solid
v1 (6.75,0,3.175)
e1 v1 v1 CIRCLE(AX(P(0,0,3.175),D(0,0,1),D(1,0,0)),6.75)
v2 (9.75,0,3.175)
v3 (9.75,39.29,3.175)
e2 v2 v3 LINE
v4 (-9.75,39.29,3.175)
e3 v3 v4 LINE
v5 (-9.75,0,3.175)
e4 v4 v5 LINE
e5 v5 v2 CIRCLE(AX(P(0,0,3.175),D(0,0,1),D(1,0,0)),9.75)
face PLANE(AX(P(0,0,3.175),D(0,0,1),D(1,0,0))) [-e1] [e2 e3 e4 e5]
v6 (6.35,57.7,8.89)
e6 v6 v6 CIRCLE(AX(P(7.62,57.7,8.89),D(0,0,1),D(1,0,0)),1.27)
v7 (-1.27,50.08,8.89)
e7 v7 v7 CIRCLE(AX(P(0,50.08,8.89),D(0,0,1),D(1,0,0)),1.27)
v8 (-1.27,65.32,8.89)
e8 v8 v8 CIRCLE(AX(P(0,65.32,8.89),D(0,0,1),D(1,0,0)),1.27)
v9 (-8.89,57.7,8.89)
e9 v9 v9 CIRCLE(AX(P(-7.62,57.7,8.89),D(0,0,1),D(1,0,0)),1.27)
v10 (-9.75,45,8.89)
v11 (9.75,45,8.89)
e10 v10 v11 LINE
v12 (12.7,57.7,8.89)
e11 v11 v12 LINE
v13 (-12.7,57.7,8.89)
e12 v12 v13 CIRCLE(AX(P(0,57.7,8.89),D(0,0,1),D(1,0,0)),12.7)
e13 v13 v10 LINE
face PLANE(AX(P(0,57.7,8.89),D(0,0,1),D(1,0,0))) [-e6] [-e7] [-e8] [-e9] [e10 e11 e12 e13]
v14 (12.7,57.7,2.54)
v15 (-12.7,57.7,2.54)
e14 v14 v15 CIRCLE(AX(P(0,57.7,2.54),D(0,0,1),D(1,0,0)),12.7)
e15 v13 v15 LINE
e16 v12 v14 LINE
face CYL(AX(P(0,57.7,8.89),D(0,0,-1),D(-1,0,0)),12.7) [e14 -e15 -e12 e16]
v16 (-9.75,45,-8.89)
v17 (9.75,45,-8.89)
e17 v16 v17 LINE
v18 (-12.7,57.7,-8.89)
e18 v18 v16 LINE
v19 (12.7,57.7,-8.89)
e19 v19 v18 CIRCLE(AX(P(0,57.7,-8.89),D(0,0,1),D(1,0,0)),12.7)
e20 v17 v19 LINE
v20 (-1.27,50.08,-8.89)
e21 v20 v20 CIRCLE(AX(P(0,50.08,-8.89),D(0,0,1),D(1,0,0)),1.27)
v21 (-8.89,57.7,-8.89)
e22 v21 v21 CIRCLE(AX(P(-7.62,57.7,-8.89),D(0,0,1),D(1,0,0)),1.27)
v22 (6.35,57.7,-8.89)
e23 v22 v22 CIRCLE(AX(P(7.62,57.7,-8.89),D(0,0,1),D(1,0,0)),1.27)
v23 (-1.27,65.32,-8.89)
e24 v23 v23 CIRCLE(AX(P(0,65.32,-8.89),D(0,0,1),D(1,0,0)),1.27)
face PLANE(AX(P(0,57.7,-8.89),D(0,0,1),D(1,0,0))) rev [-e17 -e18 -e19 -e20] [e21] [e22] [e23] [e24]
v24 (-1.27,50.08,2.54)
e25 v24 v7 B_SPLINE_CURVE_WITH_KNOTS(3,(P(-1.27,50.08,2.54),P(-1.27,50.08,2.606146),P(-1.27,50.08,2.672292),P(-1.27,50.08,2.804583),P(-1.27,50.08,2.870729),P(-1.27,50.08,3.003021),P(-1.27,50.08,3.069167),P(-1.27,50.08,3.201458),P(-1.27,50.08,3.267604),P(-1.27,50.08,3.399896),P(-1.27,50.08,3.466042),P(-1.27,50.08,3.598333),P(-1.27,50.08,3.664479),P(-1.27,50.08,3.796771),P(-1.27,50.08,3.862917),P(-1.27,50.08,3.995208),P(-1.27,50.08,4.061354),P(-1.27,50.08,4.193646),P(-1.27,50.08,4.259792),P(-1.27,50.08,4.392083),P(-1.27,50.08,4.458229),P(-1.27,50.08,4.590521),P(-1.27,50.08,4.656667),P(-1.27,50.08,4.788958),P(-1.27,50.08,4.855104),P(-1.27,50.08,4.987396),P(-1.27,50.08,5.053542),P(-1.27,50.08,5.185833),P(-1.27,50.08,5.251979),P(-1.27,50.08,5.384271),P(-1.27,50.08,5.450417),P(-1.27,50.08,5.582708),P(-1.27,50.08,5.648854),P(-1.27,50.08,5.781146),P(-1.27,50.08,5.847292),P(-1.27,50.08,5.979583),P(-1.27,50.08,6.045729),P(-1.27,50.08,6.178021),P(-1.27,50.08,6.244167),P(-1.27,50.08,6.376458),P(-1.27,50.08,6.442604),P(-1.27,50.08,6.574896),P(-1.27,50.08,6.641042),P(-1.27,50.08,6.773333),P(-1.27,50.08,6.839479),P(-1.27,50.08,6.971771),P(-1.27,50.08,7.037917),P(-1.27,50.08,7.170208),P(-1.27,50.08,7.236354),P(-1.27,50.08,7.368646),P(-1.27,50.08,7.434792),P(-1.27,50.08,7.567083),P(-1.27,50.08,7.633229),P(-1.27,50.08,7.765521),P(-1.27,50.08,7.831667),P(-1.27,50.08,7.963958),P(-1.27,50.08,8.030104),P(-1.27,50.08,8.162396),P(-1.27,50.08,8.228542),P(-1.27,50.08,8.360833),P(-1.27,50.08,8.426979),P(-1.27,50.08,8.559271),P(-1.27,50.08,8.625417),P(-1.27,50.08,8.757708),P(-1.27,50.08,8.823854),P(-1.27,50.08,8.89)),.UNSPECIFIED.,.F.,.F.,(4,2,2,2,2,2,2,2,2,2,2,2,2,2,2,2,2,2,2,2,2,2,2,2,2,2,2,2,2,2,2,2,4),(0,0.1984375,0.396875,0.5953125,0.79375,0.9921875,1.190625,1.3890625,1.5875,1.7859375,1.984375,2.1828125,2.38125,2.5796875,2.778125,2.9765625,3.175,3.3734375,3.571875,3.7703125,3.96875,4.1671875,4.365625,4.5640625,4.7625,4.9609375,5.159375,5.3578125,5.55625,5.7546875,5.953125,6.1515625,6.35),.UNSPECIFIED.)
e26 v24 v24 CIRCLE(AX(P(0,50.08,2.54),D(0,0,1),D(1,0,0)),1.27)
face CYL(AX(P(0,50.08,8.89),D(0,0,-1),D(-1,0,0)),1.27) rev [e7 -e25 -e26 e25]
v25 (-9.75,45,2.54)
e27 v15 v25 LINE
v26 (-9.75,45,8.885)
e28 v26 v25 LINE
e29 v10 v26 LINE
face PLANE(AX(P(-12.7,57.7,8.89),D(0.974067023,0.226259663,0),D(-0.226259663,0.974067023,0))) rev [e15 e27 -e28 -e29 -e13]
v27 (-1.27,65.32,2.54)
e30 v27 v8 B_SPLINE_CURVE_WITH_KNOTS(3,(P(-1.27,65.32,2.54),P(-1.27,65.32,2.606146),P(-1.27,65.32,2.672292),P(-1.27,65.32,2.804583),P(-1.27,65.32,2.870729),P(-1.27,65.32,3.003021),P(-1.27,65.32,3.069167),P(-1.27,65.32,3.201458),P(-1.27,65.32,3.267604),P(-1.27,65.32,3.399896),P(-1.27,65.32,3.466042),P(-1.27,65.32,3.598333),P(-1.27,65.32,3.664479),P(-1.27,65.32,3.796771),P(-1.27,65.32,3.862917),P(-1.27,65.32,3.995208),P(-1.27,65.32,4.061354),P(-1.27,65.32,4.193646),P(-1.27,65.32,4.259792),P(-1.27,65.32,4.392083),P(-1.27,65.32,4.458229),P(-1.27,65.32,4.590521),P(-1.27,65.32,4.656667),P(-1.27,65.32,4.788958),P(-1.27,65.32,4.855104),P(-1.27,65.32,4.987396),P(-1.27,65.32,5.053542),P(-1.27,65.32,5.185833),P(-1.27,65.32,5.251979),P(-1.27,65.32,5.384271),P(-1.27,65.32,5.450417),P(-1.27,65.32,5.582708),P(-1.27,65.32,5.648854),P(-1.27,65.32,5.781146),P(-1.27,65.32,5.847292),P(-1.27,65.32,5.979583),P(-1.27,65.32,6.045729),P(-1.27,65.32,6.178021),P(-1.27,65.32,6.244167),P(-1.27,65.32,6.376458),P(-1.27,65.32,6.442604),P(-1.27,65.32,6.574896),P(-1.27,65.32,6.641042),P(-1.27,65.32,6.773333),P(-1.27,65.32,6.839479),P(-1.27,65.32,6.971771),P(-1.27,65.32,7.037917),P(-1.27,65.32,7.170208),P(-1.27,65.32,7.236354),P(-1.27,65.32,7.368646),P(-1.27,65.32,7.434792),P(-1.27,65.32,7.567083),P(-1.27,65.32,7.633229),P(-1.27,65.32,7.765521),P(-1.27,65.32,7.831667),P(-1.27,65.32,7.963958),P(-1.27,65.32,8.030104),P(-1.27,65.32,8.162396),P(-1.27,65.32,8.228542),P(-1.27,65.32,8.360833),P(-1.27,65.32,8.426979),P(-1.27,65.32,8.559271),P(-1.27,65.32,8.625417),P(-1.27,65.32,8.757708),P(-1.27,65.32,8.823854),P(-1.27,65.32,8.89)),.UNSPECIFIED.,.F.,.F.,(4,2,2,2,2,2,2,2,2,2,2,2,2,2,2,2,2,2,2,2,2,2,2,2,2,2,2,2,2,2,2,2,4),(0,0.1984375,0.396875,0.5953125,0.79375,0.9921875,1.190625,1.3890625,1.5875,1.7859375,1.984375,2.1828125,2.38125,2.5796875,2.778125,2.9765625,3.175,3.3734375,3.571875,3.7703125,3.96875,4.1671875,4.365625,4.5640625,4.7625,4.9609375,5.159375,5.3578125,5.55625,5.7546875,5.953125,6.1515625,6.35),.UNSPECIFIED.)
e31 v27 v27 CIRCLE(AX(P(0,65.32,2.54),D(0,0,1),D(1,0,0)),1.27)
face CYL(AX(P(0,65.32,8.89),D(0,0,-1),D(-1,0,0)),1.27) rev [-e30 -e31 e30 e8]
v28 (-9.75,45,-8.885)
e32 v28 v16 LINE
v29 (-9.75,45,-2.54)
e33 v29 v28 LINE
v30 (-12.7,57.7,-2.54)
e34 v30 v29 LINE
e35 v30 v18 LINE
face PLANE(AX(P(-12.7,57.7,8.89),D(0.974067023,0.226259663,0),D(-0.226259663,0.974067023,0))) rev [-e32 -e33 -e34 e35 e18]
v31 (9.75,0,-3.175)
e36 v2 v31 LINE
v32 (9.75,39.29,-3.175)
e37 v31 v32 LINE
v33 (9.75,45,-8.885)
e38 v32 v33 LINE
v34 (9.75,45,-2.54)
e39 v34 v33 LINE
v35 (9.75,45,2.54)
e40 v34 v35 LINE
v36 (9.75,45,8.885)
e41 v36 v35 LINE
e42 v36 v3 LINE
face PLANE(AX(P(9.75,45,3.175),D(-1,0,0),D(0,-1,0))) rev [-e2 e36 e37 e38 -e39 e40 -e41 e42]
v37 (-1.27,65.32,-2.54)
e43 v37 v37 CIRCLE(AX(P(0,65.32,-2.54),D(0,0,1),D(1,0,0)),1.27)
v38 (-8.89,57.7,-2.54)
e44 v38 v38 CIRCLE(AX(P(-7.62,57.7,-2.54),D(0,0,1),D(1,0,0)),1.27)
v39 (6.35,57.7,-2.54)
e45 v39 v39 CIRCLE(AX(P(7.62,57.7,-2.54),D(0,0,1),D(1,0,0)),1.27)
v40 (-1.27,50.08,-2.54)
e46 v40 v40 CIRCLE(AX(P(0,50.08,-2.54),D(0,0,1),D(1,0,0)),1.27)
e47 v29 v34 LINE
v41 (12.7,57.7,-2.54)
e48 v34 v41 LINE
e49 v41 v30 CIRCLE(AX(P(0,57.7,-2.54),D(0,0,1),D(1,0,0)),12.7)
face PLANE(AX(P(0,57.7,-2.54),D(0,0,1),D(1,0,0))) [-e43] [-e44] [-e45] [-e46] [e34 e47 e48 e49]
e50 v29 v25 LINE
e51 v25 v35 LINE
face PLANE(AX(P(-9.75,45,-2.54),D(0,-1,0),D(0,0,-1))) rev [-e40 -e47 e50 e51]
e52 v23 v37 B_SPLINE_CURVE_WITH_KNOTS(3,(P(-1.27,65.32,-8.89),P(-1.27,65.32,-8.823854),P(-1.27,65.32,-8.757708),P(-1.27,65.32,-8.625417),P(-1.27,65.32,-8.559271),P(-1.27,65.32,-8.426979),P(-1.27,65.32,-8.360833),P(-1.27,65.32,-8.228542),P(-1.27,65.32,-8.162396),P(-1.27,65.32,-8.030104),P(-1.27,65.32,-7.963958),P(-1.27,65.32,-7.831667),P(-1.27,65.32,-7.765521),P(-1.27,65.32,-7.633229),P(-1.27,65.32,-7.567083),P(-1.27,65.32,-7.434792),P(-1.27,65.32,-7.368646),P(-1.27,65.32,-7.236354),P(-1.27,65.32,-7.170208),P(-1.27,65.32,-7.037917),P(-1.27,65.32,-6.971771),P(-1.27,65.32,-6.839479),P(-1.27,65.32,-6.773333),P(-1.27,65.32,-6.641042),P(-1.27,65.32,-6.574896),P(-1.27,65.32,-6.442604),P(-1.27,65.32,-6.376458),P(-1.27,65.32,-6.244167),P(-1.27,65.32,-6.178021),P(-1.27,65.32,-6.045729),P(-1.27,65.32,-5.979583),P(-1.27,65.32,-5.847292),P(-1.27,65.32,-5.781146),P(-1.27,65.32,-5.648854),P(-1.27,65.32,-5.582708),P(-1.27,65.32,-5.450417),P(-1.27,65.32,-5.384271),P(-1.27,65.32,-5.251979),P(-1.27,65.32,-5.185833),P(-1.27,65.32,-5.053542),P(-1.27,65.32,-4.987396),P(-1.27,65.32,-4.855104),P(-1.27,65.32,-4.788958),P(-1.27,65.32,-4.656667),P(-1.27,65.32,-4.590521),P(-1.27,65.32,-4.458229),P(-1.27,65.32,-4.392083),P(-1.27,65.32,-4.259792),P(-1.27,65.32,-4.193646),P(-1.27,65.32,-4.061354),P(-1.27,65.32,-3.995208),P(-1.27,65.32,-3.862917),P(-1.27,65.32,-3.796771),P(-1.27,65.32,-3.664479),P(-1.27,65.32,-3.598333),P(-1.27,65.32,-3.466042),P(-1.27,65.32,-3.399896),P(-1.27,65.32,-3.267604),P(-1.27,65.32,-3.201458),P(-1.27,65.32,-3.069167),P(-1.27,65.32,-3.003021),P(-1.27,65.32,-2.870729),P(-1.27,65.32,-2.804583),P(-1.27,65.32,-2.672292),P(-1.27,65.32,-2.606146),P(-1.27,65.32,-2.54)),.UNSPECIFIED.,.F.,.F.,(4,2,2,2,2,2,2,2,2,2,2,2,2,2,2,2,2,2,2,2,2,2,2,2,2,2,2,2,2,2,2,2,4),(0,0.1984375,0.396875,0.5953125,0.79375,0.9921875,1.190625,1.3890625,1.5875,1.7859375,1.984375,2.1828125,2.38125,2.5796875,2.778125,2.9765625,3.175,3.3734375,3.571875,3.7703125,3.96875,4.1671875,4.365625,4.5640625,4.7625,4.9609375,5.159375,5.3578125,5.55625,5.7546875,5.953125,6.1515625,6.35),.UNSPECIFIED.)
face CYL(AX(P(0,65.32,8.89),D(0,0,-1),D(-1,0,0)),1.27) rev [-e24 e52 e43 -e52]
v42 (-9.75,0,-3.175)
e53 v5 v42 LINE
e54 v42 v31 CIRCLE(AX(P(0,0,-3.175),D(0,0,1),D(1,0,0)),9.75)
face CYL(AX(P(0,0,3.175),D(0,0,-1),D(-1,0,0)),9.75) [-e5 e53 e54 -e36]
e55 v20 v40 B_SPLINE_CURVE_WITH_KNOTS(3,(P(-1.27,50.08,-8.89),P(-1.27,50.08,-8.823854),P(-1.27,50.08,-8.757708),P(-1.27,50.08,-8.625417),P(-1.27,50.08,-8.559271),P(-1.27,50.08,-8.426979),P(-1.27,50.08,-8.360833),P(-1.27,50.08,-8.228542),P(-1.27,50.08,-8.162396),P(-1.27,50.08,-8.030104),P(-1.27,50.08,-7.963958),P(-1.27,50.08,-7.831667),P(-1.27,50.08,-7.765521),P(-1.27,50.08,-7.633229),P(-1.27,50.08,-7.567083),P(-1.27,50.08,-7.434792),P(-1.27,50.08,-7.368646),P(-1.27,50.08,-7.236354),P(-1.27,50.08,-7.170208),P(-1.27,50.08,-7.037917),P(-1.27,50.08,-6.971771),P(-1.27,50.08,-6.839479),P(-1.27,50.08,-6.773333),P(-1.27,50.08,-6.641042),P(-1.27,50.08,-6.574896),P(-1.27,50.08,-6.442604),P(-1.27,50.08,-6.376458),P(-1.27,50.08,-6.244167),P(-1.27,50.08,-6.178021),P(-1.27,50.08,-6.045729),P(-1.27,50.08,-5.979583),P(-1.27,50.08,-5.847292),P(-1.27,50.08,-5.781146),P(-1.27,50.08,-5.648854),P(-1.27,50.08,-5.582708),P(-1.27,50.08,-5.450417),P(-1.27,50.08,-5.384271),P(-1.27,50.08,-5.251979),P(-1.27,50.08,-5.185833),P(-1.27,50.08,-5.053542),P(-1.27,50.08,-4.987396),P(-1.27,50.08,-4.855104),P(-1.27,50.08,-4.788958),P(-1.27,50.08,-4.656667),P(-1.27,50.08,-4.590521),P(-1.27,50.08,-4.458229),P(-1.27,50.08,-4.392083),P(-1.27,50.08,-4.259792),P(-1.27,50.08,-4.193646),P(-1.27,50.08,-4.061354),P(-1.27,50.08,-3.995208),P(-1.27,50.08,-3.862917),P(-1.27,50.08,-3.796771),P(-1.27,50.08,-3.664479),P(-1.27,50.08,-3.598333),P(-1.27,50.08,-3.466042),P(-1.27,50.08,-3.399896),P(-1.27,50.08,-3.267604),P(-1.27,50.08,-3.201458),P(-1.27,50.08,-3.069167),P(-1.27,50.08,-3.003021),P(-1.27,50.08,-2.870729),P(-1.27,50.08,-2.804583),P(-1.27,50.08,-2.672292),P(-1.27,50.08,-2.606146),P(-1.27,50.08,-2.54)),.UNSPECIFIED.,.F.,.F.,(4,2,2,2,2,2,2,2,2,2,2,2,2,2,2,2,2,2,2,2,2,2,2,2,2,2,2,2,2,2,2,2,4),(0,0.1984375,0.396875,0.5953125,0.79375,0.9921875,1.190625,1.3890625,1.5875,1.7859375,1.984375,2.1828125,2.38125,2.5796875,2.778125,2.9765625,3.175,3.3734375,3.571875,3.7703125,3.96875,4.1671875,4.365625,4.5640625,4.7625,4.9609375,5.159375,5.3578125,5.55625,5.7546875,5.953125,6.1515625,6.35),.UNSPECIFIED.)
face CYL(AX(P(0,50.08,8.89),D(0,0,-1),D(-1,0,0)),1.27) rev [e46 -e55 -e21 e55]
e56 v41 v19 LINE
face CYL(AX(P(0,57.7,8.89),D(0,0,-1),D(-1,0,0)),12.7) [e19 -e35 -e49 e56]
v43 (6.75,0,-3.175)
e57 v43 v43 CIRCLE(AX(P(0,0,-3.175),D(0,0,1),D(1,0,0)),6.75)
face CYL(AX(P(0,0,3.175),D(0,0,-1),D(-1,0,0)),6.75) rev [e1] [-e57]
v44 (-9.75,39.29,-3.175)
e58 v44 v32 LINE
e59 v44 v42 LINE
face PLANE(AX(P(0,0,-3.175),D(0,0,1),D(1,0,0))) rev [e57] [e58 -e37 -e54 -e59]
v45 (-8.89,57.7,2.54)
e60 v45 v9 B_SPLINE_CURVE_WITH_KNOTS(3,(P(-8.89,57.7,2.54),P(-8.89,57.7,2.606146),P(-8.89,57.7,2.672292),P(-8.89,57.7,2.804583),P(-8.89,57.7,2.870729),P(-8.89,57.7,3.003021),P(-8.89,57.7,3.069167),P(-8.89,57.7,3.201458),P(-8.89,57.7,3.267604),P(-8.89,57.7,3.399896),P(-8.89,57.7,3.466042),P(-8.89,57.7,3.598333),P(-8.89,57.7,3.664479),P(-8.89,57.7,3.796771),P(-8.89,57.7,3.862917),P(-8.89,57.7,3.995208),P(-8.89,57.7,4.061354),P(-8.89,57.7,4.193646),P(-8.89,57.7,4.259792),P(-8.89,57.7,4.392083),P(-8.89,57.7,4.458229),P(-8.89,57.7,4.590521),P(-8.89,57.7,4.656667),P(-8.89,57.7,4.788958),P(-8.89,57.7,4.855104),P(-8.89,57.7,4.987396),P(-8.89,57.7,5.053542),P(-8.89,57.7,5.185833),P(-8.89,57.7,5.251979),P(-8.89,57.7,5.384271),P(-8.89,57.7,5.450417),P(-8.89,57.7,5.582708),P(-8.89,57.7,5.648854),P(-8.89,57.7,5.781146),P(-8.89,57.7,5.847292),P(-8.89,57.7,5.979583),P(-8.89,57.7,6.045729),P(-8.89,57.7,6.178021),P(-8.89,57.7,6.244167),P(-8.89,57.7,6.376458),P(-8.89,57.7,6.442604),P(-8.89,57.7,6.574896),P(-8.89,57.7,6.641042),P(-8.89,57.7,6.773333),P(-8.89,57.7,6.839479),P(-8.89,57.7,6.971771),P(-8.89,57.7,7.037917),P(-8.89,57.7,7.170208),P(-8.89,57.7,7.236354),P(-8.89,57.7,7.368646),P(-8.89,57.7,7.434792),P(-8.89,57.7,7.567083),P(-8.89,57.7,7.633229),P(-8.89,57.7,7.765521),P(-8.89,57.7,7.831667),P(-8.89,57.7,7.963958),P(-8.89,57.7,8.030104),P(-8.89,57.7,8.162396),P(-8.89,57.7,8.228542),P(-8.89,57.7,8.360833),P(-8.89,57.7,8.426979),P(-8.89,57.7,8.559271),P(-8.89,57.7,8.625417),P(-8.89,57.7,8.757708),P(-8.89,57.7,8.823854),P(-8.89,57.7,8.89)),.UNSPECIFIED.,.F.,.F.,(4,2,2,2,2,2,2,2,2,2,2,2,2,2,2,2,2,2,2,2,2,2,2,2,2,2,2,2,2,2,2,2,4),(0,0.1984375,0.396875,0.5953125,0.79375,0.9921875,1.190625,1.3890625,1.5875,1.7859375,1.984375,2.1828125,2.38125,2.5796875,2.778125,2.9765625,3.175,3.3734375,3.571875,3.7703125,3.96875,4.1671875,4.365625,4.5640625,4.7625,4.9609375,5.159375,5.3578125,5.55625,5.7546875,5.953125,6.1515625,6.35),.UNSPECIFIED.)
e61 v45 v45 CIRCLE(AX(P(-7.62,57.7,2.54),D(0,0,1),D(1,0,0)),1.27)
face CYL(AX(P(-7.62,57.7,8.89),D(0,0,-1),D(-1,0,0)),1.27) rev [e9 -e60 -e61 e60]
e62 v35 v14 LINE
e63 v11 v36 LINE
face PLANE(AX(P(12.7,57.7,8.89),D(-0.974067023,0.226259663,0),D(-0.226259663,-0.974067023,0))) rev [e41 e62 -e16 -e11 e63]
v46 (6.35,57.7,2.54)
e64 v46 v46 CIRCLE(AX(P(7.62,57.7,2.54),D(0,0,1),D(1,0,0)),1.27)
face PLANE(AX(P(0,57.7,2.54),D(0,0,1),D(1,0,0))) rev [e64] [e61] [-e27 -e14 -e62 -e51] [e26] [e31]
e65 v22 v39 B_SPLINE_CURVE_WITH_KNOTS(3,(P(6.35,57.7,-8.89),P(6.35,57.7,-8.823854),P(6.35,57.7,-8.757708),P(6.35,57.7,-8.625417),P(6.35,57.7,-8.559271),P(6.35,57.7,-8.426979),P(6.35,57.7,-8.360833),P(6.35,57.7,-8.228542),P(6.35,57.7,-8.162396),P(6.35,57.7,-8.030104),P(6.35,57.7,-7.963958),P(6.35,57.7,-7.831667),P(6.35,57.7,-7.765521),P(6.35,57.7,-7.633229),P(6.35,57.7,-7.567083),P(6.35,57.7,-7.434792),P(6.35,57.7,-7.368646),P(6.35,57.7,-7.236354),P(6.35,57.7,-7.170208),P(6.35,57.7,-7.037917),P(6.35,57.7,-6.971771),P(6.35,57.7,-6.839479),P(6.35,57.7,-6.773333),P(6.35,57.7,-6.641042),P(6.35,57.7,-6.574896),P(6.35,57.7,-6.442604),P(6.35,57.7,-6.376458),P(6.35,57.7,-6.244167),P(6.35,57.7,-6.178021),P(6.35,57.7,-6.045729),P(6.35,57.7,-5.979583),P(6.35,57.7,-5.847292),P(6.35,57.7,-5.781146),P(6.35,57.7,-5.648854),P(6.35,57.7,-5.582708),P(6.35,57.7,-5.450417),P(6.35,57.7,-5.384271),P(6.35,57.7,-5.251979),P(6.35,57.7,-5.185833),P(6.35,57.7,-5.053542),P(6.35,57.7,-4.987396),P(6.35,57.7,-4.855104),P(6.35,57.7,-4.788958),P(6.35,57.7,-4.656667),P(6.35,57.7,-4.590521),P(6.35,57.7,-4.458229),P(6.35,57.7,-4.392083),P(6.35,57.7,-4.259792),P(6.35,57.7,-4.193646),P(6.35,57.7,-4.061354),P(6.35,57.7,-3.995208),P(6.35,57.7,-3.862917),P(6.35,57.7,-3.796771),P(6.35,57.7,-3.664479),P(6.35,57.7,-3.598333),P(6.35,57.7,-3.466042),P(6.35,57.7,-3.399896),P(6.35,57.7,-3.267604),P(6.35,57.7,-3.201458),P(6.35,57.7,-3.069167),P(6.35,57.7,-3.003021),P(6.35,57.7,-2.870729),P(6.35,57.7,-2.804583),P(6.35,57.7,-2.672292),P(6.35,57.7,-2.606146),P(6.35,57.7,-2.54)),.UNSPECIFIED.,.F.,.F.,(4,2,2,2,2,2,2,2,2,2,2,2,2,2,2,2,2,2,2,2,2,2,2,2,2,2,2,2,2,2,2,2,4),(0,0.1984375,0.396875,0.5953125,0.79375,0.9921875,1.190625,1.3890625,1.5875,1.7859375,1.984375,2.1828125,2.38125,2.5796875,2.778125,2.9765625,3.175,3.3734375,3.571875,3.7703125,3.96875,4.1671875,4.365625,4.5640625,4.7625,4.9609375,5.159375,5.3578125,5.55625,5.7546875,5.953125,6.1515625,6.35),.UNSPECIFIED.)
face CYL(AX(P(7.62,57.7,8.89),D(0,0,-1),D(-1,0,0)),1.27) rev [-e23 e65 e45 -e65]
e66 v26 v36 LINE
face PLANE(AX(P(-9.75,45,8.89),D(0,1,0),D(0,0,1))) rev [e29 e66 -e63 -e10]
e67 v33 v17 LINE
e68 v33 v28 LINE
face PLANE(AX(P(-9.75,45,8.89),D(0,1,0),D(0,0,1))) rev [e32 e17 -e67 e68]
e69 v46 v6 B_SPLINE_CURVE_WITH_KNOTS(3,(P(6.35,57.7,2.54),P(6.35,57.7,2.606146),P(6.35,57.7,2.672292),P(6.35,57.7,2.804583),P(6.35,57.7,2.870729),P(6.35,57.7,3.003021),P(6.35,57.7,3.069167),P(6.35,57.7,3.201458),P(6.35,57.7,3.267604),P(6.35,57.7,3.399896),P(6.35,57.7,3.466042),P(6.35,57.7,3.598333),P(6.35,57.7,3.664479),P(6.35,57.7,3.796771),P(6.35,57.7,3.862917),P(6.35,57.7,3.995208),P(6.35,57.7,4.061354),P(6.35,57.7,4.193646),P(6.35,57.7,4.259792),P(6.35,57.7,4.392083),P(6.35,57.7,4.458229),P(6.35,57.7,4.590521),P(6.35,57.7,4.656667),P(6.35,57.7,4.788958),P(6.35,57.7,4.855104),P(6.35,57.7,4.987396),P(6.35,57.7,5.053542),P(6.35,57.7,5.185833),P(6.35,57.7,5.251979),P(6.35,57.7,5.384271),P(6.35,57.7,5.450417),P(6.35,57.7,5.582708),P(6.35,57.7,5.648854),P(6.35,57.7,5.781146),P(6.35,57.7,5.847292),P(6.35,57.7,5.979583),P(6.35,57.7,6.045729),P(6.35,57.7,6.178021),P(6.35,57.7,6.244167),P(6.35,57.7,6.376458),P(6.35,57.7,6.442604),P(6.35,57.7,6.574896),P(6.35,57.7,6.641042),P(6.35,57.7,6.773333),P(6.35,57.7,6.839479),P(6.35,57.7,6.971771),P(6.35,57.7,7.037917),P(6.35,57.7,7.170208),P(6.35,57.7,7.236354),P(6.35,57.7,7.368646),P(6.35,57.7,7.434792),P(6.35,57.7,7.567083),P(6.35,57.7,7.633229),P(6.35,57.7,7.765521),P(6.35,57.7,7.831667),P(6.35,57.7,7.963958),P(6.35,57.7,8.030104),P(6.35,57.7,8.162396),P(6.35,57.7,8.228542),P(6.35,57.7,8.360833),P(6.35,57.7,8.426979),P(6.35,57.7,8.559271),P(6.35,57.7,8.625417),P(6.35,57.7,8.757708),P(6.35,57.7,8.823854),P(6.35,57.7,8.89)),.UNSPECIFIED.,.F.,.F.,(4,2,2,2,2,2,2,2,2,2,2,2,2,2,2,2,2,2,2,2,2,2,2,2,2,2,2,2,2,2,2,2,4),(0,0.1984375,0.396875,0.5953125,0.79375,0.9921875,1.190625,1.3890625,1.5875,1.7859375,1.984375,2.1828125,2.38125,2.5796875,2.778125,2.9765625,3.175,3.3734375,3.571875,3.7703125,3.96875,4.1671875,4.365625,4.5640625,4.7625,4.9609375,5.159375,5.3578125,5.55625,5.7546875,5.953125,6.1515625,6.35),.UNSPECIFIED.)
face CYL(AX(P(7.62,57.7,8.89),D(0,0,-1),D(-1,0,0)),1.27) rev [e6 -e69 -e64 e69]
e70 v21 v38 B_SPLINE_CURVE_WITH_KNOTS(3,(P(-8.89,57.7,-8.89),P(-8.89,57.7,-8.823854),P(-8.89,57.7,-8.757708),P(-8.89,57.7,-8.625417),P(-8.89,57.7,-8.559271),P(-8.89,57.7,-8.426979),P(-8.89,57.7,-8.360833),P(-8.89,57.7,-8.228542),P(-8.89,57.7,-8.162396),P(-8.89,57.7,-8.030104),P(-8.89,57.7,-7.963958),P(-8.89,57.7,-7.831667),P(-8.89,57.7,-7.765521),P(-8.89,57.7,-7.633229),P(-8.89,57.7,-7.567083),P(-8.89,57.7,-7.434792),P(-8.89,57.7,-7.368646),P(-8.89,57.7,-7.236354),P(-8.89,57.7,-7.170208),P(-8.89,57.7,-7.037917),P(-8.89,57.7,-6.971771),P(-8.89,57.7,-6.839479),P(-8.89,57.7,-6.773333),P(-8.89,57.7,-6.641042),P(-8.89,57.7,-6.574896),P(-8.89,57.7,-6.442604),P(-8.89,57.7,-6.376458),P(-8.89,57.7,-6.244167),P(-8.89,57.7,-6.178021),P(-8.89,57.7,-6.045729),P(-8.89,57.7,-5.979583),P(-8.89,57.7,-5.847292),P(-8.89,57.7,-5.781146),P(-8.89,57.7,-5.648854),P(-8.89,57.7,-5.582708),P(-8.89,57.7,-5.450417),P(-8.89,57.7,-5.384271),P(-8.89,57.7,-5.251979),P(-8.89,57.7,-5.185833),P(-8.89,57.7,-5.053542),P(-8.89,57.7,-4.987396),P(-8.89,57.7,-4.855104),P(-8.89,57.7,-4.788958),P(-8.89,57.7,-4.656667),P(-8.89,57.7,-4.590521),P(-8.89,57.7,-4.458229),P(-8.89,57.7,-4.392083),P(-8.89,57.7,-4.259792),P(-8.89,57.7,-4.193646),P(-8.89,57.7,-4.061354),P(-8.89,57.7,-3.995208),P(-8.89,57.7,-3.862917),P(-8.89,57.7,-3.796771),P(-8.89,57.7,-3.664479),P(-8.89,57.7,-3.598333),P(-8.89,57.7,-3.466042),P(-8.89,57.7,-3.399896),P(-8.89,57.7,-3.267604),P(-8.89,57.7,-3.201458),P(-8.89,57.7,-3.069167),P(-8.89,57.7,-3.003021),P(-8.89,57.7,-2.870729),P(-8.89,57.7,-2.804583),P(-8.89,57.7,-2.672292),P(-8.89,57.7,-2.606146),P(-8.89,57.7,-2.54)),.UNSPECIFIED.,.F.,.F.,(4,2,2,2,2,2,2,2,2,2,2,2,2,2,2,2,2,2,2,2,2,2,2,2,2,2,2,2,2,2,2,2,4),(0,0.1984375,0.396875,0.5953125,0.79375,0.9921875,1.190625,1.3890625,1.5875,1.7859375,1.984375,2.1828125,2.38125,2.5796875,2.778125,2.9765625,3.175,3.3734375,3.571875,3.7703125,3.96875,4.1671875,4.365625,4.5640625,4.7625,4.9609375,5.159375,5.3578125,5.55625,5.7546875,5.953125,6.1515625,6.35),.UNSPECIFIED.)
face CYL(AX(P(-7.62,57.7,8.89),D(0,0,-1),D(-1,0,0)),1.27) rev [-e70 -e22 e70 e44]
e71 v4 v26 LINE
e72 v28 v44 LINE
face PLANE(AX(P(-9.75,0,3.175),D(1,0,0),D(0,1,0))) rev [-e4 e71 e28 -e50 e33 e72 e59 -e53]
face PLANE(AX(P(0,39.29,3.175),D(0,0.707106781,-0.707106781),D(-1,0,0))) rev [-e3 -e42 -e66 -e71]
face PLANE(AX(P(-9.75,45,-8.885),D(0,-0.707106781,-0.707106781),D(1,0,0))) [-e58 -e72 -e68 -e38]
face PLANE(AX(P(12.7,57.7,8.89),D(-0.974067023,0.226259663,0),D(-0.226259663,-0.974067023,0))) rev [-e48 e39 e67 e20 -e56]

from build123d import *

# Parameters (mm, degrees)
SKETCH1_R           = 6.75
BOSS_EXTRUDE1_DEPTH = 3.175
SKETCH4_R           = 1.27
BOSS_EXTRUDE2_DEPTH = 8.89
CHAMFER1_SIZE       = 5.71
CUT_EXTRUDE1_DEPTH  = 2.54


with BuildPart() as part:
    # Sketch1 → Boss-Extrude1 (new, symmetric)
    with BuildSketch(Plane.XY):
        with BuildLine():
            Line((-9.75, 0), (-9.75, 45))
            Line((-9.75, 45), (9.75, 45))
            Line((9.75, 45), (9.75, 0))
            ThreePointArc((9.75, 0), (0, -9.75), (-9.75, 0))
        make_face()
        Circle(SKETCH1_R, mode=Mode.SUBTRACT)
    extrude(amount=BOSS_EXTRUDE1_DEPTH, both=True)

    # Sketch4 → Boss-Extrude2 (add, symmetric)
    with BuildSketch(Plane.XY):
        with BuildLine():
            Line((-12.7, 57.7), (-9.75, 45))
            Line((-9.75, 45), (9.75, 45))
            Line((9.75, 45), (12.7, 57.7))
            ThreePointArc((12.7, 57.7), (0, 70.4), (-12.7, 57.7))
        make_face()
        with Locations(Location((0, 65.32, 0), (0, 0, 180))):
            Circle(SKETCH4_R, mode=Mode.SUBTRACT)
        with Locations(Location((7.62, 57.7, 0), (0, 0, 180))):
            Circle(SKETCH4_R, mode=Mode.SUBTRACT)
        with Locations(Location((0, 50.08, 0), (0, 0, 180))):
            Circle(SKETCH4_R, mode=Mode.SUBTRACT)
        with Locations(Location((-7.62, 57.7, 0), (0, 0, 180))):
            Circle(SKETCH4_R, mode=Mode.SUBTRACT)
    extrude(amount=BOSS_EXTRUDE2_DEPTH, both=True)

    # Chamfer1
    # the kernel refuses this chamfer: 5.71 mm, written as the material it adds along each edge
    with BuildSketch(Plane(origin=(-9.75, 45, 3.175), x_dir=(0, 0.02749587661058595, 0.9996219169112968), z_dir=(1, 0, 0))) as chamfer1_piece_1_section:
        Polygon((CHAMFER1_SIZE * 0.999621916911, CHAMFER1_SIZE * 0.0274958766106), (-CHAMFER1_SIZE * 0.0274958766106, CHAMFER1_SIZE * 0.999621916911), (0, 0), align=None)
    chamfer1_piece_1 = extrude(amount=19.5, mode=Mode.PRIVATE)
    chamfer1_piece_1 = split(chamfer1_piece_1, bisect_by=Plane(origin=(-9.076297476, 42.099653541, 4.47568677), z_dir=(-0.9740670228457147, -0.2262596627869977, 0)), keep=Keep.TOP, mode=Mode.PRIVATE)
    add(chamfer1_piece_1)
    with BuildSketch(Plane(origin=(-9.75, 45, 3.175), x_dir=(0, 0.02749587661058595, 0.9996219169112968), z_dir=(1, 0, 0))) as chamfer1_piece_2_section:
        Polygon((CHAMFER1_SIZE * 0.999621916911, CHAMFER1_SIZE * 0.0274958766106), (-CHAMFER1_SIZE * 0.0274958766106, CHAMFER1_SIZE * 0.999621916911), (0, 0), align=None)
    chamfer1_piece_2 = extrude(amount=19.5, mode=Mode.PRIVATE)
    chamfer1_piece_2 = split(chamfer1_piece_2, bisect_by=Plane(origin=(-8.84718109, 41.113288082, 5.085534979), z_dir=(0.9740670228457147, 0.2262596627869977, 0)), keep=Keep.TOP, mode=Mode.PRIVATE)
    chamfer1_piece_2 = split(chamfer1_piece_2, bisect_by=Plane(origin=(8.84718109, 41.113288082, 5.085534979), z_dir=(-0.9740670228457147, 0.2262596627869977, 0)), keep=Keep.TOP, mode=Mode.PRIVATE)
    add(chamfer1_piece_2)
    with BuildSketch(Plane(origin=(-9.75, 45, 3.175), x_dir=(0, 0.02749587661058595, 0.9996219169112968), z_dir=(1, 0, 0))) as chamfer1_piece_3_section:
        Polygon((CHAMFER1_SIZE * 0.999621916911, CHAMFER1_SIZE * 0.0274958766106), (-CHAMFER1_SIZE * 0.0274958766106, CHAMFER1_SIZE * 0.999621916911), (0, 0), align=None)
    chamfer1_piece_3 = extrude(amount=19.5, mode=Mode.PRIVATE)
    chamfer1_piece_3 = split(chamfer1_piece_3, bisect_by=Plane(origin=(9.076297476, 42.099653541, 4.47568677), z_dir=(0.9740670228457147, -0.2262596627869977, 0)), keep=Keep.TOP, mode=Mode.PRIVATE)
    add(chamfer1_piece_3)
    with BuildSketch(Plane(origin=(-9.75, 45, -3.175), x_dir=(0, 0.02749587661058595, -0.9996219169112968), z_dir=(1, 0, 0))) as chamfer1_piece_4_section:
        Polygon((CHAMFER1_SIZE * 0.999621916911, -CHAMFER1_SIZE * 0.0274958766106), (-CHAMFER1_SIZE * 0.0274958766106, -CHAMFER1_SIZE * 0.999621916911), (0, 0), align=None)
    chamfer1_piece_4 = extrude(amount=19.5, mode=Mode.PRIVATE)
    chamfer1_piece_4 = split(chamfer1_piece_4, bisect_by=Plane(origin=(-9.076297476, 42.099653541, -4.47568677), z_dir=(-0.9740670228457147, -0.2262596627869977, 0)), keep=Keep.TOP, mode=Mode.PRIVATE)
    add(chamfer1_piece_4)
    with BuildSketch(Plane(origin=(-9.75, 45, -3.175), x_dir=(0, 0.02749587661058595, -0.9996219169112968), z_dir=(1, 0, 0))) as chamfer1_piece_5_section:
        Polygon((CHAMFER1_SIZE * 0.999621916911, -CHAMFER1_SIZE * 0.0274958766106), (-CHAMFER1_SIZE * 0.0274958766106, -CHAMFER1_SIZE * 0.999621916911), (0, 0), align=None)
    chamfer1_piece_5 = extrude(amount=19.5, mode=Mode.PRIVATE)
    chamfer1_piece_5 = split(chamfer1_piece_5, bisect_by=Plane(origin=(-8.84718109, 41.113288082, -5.085534979), z_dir=(0.9740670228457147, 0.2262596627869977, 0)), keep=Keep.TOP, mode=Mode.PRIVATE)
    chamfer1_piece_5 = split(chamfer1_piece_5, bisect_by=Plane(origin=(8.84718109, 41.113288082, -5.085534979), z_dir=(-0.9740670228457147, 0.2262596627869977, 0)), keep=Keep.TOP, mode=Mode.PRIVATE)
    add(chamfer1_piece_5)
    with BuildSketch(Plane(origin=(-9.75, 45, -3.175), x_dir=(0, 0.02749587661058595, -0.9996219169112968), z_dir=(1, 0, 0))) as chamfer1_piece_6_section:
        Polygon((CHAMFER1_SIZE * 0.999621916911, -CHAMFER1_SIZE * 0.0274958766106), (-CHAMFER1_SIZE * 0.0274958766106, -CHAMFER1_SIZE * 0.999621916911), (0, 0), align=None)
    chamfer1_piece_6 = extrude(amount=19.5, mode=Mode.PRIVATE)
    chamfer1_piece_6 = split(chamfer1_piece_6, bisect_by=Plane(origin=(9.076297476, 42.099653541, -4.47568677), z_dir=(0.9740670228457147, -0.2262596627869977, 0)), keep=Keep.TOP, mode=Mode.PRIVATE)
    add(chamfer1_piece_6)

    # Sketch5 → Cut-Extrude1 (cut, symmetric)
    with BuildSketch(Plane.XY):
        with BuildLine():
            Line((-12.7, 57.7), (-9.75, 45))
            Line((-9.75, 45), (9.75, 45))
            Line((9.75, 45), (12.7, 57.7))
            ThreePointArc((12.7, 57.7), (0, 70.4), (-12.7, 57.7))
        make_face()
    extrude(amount=CUT_EXTRUDE1_DEPTH, both=True, mode=Mode.SUBTRACT)


solid = part.part
